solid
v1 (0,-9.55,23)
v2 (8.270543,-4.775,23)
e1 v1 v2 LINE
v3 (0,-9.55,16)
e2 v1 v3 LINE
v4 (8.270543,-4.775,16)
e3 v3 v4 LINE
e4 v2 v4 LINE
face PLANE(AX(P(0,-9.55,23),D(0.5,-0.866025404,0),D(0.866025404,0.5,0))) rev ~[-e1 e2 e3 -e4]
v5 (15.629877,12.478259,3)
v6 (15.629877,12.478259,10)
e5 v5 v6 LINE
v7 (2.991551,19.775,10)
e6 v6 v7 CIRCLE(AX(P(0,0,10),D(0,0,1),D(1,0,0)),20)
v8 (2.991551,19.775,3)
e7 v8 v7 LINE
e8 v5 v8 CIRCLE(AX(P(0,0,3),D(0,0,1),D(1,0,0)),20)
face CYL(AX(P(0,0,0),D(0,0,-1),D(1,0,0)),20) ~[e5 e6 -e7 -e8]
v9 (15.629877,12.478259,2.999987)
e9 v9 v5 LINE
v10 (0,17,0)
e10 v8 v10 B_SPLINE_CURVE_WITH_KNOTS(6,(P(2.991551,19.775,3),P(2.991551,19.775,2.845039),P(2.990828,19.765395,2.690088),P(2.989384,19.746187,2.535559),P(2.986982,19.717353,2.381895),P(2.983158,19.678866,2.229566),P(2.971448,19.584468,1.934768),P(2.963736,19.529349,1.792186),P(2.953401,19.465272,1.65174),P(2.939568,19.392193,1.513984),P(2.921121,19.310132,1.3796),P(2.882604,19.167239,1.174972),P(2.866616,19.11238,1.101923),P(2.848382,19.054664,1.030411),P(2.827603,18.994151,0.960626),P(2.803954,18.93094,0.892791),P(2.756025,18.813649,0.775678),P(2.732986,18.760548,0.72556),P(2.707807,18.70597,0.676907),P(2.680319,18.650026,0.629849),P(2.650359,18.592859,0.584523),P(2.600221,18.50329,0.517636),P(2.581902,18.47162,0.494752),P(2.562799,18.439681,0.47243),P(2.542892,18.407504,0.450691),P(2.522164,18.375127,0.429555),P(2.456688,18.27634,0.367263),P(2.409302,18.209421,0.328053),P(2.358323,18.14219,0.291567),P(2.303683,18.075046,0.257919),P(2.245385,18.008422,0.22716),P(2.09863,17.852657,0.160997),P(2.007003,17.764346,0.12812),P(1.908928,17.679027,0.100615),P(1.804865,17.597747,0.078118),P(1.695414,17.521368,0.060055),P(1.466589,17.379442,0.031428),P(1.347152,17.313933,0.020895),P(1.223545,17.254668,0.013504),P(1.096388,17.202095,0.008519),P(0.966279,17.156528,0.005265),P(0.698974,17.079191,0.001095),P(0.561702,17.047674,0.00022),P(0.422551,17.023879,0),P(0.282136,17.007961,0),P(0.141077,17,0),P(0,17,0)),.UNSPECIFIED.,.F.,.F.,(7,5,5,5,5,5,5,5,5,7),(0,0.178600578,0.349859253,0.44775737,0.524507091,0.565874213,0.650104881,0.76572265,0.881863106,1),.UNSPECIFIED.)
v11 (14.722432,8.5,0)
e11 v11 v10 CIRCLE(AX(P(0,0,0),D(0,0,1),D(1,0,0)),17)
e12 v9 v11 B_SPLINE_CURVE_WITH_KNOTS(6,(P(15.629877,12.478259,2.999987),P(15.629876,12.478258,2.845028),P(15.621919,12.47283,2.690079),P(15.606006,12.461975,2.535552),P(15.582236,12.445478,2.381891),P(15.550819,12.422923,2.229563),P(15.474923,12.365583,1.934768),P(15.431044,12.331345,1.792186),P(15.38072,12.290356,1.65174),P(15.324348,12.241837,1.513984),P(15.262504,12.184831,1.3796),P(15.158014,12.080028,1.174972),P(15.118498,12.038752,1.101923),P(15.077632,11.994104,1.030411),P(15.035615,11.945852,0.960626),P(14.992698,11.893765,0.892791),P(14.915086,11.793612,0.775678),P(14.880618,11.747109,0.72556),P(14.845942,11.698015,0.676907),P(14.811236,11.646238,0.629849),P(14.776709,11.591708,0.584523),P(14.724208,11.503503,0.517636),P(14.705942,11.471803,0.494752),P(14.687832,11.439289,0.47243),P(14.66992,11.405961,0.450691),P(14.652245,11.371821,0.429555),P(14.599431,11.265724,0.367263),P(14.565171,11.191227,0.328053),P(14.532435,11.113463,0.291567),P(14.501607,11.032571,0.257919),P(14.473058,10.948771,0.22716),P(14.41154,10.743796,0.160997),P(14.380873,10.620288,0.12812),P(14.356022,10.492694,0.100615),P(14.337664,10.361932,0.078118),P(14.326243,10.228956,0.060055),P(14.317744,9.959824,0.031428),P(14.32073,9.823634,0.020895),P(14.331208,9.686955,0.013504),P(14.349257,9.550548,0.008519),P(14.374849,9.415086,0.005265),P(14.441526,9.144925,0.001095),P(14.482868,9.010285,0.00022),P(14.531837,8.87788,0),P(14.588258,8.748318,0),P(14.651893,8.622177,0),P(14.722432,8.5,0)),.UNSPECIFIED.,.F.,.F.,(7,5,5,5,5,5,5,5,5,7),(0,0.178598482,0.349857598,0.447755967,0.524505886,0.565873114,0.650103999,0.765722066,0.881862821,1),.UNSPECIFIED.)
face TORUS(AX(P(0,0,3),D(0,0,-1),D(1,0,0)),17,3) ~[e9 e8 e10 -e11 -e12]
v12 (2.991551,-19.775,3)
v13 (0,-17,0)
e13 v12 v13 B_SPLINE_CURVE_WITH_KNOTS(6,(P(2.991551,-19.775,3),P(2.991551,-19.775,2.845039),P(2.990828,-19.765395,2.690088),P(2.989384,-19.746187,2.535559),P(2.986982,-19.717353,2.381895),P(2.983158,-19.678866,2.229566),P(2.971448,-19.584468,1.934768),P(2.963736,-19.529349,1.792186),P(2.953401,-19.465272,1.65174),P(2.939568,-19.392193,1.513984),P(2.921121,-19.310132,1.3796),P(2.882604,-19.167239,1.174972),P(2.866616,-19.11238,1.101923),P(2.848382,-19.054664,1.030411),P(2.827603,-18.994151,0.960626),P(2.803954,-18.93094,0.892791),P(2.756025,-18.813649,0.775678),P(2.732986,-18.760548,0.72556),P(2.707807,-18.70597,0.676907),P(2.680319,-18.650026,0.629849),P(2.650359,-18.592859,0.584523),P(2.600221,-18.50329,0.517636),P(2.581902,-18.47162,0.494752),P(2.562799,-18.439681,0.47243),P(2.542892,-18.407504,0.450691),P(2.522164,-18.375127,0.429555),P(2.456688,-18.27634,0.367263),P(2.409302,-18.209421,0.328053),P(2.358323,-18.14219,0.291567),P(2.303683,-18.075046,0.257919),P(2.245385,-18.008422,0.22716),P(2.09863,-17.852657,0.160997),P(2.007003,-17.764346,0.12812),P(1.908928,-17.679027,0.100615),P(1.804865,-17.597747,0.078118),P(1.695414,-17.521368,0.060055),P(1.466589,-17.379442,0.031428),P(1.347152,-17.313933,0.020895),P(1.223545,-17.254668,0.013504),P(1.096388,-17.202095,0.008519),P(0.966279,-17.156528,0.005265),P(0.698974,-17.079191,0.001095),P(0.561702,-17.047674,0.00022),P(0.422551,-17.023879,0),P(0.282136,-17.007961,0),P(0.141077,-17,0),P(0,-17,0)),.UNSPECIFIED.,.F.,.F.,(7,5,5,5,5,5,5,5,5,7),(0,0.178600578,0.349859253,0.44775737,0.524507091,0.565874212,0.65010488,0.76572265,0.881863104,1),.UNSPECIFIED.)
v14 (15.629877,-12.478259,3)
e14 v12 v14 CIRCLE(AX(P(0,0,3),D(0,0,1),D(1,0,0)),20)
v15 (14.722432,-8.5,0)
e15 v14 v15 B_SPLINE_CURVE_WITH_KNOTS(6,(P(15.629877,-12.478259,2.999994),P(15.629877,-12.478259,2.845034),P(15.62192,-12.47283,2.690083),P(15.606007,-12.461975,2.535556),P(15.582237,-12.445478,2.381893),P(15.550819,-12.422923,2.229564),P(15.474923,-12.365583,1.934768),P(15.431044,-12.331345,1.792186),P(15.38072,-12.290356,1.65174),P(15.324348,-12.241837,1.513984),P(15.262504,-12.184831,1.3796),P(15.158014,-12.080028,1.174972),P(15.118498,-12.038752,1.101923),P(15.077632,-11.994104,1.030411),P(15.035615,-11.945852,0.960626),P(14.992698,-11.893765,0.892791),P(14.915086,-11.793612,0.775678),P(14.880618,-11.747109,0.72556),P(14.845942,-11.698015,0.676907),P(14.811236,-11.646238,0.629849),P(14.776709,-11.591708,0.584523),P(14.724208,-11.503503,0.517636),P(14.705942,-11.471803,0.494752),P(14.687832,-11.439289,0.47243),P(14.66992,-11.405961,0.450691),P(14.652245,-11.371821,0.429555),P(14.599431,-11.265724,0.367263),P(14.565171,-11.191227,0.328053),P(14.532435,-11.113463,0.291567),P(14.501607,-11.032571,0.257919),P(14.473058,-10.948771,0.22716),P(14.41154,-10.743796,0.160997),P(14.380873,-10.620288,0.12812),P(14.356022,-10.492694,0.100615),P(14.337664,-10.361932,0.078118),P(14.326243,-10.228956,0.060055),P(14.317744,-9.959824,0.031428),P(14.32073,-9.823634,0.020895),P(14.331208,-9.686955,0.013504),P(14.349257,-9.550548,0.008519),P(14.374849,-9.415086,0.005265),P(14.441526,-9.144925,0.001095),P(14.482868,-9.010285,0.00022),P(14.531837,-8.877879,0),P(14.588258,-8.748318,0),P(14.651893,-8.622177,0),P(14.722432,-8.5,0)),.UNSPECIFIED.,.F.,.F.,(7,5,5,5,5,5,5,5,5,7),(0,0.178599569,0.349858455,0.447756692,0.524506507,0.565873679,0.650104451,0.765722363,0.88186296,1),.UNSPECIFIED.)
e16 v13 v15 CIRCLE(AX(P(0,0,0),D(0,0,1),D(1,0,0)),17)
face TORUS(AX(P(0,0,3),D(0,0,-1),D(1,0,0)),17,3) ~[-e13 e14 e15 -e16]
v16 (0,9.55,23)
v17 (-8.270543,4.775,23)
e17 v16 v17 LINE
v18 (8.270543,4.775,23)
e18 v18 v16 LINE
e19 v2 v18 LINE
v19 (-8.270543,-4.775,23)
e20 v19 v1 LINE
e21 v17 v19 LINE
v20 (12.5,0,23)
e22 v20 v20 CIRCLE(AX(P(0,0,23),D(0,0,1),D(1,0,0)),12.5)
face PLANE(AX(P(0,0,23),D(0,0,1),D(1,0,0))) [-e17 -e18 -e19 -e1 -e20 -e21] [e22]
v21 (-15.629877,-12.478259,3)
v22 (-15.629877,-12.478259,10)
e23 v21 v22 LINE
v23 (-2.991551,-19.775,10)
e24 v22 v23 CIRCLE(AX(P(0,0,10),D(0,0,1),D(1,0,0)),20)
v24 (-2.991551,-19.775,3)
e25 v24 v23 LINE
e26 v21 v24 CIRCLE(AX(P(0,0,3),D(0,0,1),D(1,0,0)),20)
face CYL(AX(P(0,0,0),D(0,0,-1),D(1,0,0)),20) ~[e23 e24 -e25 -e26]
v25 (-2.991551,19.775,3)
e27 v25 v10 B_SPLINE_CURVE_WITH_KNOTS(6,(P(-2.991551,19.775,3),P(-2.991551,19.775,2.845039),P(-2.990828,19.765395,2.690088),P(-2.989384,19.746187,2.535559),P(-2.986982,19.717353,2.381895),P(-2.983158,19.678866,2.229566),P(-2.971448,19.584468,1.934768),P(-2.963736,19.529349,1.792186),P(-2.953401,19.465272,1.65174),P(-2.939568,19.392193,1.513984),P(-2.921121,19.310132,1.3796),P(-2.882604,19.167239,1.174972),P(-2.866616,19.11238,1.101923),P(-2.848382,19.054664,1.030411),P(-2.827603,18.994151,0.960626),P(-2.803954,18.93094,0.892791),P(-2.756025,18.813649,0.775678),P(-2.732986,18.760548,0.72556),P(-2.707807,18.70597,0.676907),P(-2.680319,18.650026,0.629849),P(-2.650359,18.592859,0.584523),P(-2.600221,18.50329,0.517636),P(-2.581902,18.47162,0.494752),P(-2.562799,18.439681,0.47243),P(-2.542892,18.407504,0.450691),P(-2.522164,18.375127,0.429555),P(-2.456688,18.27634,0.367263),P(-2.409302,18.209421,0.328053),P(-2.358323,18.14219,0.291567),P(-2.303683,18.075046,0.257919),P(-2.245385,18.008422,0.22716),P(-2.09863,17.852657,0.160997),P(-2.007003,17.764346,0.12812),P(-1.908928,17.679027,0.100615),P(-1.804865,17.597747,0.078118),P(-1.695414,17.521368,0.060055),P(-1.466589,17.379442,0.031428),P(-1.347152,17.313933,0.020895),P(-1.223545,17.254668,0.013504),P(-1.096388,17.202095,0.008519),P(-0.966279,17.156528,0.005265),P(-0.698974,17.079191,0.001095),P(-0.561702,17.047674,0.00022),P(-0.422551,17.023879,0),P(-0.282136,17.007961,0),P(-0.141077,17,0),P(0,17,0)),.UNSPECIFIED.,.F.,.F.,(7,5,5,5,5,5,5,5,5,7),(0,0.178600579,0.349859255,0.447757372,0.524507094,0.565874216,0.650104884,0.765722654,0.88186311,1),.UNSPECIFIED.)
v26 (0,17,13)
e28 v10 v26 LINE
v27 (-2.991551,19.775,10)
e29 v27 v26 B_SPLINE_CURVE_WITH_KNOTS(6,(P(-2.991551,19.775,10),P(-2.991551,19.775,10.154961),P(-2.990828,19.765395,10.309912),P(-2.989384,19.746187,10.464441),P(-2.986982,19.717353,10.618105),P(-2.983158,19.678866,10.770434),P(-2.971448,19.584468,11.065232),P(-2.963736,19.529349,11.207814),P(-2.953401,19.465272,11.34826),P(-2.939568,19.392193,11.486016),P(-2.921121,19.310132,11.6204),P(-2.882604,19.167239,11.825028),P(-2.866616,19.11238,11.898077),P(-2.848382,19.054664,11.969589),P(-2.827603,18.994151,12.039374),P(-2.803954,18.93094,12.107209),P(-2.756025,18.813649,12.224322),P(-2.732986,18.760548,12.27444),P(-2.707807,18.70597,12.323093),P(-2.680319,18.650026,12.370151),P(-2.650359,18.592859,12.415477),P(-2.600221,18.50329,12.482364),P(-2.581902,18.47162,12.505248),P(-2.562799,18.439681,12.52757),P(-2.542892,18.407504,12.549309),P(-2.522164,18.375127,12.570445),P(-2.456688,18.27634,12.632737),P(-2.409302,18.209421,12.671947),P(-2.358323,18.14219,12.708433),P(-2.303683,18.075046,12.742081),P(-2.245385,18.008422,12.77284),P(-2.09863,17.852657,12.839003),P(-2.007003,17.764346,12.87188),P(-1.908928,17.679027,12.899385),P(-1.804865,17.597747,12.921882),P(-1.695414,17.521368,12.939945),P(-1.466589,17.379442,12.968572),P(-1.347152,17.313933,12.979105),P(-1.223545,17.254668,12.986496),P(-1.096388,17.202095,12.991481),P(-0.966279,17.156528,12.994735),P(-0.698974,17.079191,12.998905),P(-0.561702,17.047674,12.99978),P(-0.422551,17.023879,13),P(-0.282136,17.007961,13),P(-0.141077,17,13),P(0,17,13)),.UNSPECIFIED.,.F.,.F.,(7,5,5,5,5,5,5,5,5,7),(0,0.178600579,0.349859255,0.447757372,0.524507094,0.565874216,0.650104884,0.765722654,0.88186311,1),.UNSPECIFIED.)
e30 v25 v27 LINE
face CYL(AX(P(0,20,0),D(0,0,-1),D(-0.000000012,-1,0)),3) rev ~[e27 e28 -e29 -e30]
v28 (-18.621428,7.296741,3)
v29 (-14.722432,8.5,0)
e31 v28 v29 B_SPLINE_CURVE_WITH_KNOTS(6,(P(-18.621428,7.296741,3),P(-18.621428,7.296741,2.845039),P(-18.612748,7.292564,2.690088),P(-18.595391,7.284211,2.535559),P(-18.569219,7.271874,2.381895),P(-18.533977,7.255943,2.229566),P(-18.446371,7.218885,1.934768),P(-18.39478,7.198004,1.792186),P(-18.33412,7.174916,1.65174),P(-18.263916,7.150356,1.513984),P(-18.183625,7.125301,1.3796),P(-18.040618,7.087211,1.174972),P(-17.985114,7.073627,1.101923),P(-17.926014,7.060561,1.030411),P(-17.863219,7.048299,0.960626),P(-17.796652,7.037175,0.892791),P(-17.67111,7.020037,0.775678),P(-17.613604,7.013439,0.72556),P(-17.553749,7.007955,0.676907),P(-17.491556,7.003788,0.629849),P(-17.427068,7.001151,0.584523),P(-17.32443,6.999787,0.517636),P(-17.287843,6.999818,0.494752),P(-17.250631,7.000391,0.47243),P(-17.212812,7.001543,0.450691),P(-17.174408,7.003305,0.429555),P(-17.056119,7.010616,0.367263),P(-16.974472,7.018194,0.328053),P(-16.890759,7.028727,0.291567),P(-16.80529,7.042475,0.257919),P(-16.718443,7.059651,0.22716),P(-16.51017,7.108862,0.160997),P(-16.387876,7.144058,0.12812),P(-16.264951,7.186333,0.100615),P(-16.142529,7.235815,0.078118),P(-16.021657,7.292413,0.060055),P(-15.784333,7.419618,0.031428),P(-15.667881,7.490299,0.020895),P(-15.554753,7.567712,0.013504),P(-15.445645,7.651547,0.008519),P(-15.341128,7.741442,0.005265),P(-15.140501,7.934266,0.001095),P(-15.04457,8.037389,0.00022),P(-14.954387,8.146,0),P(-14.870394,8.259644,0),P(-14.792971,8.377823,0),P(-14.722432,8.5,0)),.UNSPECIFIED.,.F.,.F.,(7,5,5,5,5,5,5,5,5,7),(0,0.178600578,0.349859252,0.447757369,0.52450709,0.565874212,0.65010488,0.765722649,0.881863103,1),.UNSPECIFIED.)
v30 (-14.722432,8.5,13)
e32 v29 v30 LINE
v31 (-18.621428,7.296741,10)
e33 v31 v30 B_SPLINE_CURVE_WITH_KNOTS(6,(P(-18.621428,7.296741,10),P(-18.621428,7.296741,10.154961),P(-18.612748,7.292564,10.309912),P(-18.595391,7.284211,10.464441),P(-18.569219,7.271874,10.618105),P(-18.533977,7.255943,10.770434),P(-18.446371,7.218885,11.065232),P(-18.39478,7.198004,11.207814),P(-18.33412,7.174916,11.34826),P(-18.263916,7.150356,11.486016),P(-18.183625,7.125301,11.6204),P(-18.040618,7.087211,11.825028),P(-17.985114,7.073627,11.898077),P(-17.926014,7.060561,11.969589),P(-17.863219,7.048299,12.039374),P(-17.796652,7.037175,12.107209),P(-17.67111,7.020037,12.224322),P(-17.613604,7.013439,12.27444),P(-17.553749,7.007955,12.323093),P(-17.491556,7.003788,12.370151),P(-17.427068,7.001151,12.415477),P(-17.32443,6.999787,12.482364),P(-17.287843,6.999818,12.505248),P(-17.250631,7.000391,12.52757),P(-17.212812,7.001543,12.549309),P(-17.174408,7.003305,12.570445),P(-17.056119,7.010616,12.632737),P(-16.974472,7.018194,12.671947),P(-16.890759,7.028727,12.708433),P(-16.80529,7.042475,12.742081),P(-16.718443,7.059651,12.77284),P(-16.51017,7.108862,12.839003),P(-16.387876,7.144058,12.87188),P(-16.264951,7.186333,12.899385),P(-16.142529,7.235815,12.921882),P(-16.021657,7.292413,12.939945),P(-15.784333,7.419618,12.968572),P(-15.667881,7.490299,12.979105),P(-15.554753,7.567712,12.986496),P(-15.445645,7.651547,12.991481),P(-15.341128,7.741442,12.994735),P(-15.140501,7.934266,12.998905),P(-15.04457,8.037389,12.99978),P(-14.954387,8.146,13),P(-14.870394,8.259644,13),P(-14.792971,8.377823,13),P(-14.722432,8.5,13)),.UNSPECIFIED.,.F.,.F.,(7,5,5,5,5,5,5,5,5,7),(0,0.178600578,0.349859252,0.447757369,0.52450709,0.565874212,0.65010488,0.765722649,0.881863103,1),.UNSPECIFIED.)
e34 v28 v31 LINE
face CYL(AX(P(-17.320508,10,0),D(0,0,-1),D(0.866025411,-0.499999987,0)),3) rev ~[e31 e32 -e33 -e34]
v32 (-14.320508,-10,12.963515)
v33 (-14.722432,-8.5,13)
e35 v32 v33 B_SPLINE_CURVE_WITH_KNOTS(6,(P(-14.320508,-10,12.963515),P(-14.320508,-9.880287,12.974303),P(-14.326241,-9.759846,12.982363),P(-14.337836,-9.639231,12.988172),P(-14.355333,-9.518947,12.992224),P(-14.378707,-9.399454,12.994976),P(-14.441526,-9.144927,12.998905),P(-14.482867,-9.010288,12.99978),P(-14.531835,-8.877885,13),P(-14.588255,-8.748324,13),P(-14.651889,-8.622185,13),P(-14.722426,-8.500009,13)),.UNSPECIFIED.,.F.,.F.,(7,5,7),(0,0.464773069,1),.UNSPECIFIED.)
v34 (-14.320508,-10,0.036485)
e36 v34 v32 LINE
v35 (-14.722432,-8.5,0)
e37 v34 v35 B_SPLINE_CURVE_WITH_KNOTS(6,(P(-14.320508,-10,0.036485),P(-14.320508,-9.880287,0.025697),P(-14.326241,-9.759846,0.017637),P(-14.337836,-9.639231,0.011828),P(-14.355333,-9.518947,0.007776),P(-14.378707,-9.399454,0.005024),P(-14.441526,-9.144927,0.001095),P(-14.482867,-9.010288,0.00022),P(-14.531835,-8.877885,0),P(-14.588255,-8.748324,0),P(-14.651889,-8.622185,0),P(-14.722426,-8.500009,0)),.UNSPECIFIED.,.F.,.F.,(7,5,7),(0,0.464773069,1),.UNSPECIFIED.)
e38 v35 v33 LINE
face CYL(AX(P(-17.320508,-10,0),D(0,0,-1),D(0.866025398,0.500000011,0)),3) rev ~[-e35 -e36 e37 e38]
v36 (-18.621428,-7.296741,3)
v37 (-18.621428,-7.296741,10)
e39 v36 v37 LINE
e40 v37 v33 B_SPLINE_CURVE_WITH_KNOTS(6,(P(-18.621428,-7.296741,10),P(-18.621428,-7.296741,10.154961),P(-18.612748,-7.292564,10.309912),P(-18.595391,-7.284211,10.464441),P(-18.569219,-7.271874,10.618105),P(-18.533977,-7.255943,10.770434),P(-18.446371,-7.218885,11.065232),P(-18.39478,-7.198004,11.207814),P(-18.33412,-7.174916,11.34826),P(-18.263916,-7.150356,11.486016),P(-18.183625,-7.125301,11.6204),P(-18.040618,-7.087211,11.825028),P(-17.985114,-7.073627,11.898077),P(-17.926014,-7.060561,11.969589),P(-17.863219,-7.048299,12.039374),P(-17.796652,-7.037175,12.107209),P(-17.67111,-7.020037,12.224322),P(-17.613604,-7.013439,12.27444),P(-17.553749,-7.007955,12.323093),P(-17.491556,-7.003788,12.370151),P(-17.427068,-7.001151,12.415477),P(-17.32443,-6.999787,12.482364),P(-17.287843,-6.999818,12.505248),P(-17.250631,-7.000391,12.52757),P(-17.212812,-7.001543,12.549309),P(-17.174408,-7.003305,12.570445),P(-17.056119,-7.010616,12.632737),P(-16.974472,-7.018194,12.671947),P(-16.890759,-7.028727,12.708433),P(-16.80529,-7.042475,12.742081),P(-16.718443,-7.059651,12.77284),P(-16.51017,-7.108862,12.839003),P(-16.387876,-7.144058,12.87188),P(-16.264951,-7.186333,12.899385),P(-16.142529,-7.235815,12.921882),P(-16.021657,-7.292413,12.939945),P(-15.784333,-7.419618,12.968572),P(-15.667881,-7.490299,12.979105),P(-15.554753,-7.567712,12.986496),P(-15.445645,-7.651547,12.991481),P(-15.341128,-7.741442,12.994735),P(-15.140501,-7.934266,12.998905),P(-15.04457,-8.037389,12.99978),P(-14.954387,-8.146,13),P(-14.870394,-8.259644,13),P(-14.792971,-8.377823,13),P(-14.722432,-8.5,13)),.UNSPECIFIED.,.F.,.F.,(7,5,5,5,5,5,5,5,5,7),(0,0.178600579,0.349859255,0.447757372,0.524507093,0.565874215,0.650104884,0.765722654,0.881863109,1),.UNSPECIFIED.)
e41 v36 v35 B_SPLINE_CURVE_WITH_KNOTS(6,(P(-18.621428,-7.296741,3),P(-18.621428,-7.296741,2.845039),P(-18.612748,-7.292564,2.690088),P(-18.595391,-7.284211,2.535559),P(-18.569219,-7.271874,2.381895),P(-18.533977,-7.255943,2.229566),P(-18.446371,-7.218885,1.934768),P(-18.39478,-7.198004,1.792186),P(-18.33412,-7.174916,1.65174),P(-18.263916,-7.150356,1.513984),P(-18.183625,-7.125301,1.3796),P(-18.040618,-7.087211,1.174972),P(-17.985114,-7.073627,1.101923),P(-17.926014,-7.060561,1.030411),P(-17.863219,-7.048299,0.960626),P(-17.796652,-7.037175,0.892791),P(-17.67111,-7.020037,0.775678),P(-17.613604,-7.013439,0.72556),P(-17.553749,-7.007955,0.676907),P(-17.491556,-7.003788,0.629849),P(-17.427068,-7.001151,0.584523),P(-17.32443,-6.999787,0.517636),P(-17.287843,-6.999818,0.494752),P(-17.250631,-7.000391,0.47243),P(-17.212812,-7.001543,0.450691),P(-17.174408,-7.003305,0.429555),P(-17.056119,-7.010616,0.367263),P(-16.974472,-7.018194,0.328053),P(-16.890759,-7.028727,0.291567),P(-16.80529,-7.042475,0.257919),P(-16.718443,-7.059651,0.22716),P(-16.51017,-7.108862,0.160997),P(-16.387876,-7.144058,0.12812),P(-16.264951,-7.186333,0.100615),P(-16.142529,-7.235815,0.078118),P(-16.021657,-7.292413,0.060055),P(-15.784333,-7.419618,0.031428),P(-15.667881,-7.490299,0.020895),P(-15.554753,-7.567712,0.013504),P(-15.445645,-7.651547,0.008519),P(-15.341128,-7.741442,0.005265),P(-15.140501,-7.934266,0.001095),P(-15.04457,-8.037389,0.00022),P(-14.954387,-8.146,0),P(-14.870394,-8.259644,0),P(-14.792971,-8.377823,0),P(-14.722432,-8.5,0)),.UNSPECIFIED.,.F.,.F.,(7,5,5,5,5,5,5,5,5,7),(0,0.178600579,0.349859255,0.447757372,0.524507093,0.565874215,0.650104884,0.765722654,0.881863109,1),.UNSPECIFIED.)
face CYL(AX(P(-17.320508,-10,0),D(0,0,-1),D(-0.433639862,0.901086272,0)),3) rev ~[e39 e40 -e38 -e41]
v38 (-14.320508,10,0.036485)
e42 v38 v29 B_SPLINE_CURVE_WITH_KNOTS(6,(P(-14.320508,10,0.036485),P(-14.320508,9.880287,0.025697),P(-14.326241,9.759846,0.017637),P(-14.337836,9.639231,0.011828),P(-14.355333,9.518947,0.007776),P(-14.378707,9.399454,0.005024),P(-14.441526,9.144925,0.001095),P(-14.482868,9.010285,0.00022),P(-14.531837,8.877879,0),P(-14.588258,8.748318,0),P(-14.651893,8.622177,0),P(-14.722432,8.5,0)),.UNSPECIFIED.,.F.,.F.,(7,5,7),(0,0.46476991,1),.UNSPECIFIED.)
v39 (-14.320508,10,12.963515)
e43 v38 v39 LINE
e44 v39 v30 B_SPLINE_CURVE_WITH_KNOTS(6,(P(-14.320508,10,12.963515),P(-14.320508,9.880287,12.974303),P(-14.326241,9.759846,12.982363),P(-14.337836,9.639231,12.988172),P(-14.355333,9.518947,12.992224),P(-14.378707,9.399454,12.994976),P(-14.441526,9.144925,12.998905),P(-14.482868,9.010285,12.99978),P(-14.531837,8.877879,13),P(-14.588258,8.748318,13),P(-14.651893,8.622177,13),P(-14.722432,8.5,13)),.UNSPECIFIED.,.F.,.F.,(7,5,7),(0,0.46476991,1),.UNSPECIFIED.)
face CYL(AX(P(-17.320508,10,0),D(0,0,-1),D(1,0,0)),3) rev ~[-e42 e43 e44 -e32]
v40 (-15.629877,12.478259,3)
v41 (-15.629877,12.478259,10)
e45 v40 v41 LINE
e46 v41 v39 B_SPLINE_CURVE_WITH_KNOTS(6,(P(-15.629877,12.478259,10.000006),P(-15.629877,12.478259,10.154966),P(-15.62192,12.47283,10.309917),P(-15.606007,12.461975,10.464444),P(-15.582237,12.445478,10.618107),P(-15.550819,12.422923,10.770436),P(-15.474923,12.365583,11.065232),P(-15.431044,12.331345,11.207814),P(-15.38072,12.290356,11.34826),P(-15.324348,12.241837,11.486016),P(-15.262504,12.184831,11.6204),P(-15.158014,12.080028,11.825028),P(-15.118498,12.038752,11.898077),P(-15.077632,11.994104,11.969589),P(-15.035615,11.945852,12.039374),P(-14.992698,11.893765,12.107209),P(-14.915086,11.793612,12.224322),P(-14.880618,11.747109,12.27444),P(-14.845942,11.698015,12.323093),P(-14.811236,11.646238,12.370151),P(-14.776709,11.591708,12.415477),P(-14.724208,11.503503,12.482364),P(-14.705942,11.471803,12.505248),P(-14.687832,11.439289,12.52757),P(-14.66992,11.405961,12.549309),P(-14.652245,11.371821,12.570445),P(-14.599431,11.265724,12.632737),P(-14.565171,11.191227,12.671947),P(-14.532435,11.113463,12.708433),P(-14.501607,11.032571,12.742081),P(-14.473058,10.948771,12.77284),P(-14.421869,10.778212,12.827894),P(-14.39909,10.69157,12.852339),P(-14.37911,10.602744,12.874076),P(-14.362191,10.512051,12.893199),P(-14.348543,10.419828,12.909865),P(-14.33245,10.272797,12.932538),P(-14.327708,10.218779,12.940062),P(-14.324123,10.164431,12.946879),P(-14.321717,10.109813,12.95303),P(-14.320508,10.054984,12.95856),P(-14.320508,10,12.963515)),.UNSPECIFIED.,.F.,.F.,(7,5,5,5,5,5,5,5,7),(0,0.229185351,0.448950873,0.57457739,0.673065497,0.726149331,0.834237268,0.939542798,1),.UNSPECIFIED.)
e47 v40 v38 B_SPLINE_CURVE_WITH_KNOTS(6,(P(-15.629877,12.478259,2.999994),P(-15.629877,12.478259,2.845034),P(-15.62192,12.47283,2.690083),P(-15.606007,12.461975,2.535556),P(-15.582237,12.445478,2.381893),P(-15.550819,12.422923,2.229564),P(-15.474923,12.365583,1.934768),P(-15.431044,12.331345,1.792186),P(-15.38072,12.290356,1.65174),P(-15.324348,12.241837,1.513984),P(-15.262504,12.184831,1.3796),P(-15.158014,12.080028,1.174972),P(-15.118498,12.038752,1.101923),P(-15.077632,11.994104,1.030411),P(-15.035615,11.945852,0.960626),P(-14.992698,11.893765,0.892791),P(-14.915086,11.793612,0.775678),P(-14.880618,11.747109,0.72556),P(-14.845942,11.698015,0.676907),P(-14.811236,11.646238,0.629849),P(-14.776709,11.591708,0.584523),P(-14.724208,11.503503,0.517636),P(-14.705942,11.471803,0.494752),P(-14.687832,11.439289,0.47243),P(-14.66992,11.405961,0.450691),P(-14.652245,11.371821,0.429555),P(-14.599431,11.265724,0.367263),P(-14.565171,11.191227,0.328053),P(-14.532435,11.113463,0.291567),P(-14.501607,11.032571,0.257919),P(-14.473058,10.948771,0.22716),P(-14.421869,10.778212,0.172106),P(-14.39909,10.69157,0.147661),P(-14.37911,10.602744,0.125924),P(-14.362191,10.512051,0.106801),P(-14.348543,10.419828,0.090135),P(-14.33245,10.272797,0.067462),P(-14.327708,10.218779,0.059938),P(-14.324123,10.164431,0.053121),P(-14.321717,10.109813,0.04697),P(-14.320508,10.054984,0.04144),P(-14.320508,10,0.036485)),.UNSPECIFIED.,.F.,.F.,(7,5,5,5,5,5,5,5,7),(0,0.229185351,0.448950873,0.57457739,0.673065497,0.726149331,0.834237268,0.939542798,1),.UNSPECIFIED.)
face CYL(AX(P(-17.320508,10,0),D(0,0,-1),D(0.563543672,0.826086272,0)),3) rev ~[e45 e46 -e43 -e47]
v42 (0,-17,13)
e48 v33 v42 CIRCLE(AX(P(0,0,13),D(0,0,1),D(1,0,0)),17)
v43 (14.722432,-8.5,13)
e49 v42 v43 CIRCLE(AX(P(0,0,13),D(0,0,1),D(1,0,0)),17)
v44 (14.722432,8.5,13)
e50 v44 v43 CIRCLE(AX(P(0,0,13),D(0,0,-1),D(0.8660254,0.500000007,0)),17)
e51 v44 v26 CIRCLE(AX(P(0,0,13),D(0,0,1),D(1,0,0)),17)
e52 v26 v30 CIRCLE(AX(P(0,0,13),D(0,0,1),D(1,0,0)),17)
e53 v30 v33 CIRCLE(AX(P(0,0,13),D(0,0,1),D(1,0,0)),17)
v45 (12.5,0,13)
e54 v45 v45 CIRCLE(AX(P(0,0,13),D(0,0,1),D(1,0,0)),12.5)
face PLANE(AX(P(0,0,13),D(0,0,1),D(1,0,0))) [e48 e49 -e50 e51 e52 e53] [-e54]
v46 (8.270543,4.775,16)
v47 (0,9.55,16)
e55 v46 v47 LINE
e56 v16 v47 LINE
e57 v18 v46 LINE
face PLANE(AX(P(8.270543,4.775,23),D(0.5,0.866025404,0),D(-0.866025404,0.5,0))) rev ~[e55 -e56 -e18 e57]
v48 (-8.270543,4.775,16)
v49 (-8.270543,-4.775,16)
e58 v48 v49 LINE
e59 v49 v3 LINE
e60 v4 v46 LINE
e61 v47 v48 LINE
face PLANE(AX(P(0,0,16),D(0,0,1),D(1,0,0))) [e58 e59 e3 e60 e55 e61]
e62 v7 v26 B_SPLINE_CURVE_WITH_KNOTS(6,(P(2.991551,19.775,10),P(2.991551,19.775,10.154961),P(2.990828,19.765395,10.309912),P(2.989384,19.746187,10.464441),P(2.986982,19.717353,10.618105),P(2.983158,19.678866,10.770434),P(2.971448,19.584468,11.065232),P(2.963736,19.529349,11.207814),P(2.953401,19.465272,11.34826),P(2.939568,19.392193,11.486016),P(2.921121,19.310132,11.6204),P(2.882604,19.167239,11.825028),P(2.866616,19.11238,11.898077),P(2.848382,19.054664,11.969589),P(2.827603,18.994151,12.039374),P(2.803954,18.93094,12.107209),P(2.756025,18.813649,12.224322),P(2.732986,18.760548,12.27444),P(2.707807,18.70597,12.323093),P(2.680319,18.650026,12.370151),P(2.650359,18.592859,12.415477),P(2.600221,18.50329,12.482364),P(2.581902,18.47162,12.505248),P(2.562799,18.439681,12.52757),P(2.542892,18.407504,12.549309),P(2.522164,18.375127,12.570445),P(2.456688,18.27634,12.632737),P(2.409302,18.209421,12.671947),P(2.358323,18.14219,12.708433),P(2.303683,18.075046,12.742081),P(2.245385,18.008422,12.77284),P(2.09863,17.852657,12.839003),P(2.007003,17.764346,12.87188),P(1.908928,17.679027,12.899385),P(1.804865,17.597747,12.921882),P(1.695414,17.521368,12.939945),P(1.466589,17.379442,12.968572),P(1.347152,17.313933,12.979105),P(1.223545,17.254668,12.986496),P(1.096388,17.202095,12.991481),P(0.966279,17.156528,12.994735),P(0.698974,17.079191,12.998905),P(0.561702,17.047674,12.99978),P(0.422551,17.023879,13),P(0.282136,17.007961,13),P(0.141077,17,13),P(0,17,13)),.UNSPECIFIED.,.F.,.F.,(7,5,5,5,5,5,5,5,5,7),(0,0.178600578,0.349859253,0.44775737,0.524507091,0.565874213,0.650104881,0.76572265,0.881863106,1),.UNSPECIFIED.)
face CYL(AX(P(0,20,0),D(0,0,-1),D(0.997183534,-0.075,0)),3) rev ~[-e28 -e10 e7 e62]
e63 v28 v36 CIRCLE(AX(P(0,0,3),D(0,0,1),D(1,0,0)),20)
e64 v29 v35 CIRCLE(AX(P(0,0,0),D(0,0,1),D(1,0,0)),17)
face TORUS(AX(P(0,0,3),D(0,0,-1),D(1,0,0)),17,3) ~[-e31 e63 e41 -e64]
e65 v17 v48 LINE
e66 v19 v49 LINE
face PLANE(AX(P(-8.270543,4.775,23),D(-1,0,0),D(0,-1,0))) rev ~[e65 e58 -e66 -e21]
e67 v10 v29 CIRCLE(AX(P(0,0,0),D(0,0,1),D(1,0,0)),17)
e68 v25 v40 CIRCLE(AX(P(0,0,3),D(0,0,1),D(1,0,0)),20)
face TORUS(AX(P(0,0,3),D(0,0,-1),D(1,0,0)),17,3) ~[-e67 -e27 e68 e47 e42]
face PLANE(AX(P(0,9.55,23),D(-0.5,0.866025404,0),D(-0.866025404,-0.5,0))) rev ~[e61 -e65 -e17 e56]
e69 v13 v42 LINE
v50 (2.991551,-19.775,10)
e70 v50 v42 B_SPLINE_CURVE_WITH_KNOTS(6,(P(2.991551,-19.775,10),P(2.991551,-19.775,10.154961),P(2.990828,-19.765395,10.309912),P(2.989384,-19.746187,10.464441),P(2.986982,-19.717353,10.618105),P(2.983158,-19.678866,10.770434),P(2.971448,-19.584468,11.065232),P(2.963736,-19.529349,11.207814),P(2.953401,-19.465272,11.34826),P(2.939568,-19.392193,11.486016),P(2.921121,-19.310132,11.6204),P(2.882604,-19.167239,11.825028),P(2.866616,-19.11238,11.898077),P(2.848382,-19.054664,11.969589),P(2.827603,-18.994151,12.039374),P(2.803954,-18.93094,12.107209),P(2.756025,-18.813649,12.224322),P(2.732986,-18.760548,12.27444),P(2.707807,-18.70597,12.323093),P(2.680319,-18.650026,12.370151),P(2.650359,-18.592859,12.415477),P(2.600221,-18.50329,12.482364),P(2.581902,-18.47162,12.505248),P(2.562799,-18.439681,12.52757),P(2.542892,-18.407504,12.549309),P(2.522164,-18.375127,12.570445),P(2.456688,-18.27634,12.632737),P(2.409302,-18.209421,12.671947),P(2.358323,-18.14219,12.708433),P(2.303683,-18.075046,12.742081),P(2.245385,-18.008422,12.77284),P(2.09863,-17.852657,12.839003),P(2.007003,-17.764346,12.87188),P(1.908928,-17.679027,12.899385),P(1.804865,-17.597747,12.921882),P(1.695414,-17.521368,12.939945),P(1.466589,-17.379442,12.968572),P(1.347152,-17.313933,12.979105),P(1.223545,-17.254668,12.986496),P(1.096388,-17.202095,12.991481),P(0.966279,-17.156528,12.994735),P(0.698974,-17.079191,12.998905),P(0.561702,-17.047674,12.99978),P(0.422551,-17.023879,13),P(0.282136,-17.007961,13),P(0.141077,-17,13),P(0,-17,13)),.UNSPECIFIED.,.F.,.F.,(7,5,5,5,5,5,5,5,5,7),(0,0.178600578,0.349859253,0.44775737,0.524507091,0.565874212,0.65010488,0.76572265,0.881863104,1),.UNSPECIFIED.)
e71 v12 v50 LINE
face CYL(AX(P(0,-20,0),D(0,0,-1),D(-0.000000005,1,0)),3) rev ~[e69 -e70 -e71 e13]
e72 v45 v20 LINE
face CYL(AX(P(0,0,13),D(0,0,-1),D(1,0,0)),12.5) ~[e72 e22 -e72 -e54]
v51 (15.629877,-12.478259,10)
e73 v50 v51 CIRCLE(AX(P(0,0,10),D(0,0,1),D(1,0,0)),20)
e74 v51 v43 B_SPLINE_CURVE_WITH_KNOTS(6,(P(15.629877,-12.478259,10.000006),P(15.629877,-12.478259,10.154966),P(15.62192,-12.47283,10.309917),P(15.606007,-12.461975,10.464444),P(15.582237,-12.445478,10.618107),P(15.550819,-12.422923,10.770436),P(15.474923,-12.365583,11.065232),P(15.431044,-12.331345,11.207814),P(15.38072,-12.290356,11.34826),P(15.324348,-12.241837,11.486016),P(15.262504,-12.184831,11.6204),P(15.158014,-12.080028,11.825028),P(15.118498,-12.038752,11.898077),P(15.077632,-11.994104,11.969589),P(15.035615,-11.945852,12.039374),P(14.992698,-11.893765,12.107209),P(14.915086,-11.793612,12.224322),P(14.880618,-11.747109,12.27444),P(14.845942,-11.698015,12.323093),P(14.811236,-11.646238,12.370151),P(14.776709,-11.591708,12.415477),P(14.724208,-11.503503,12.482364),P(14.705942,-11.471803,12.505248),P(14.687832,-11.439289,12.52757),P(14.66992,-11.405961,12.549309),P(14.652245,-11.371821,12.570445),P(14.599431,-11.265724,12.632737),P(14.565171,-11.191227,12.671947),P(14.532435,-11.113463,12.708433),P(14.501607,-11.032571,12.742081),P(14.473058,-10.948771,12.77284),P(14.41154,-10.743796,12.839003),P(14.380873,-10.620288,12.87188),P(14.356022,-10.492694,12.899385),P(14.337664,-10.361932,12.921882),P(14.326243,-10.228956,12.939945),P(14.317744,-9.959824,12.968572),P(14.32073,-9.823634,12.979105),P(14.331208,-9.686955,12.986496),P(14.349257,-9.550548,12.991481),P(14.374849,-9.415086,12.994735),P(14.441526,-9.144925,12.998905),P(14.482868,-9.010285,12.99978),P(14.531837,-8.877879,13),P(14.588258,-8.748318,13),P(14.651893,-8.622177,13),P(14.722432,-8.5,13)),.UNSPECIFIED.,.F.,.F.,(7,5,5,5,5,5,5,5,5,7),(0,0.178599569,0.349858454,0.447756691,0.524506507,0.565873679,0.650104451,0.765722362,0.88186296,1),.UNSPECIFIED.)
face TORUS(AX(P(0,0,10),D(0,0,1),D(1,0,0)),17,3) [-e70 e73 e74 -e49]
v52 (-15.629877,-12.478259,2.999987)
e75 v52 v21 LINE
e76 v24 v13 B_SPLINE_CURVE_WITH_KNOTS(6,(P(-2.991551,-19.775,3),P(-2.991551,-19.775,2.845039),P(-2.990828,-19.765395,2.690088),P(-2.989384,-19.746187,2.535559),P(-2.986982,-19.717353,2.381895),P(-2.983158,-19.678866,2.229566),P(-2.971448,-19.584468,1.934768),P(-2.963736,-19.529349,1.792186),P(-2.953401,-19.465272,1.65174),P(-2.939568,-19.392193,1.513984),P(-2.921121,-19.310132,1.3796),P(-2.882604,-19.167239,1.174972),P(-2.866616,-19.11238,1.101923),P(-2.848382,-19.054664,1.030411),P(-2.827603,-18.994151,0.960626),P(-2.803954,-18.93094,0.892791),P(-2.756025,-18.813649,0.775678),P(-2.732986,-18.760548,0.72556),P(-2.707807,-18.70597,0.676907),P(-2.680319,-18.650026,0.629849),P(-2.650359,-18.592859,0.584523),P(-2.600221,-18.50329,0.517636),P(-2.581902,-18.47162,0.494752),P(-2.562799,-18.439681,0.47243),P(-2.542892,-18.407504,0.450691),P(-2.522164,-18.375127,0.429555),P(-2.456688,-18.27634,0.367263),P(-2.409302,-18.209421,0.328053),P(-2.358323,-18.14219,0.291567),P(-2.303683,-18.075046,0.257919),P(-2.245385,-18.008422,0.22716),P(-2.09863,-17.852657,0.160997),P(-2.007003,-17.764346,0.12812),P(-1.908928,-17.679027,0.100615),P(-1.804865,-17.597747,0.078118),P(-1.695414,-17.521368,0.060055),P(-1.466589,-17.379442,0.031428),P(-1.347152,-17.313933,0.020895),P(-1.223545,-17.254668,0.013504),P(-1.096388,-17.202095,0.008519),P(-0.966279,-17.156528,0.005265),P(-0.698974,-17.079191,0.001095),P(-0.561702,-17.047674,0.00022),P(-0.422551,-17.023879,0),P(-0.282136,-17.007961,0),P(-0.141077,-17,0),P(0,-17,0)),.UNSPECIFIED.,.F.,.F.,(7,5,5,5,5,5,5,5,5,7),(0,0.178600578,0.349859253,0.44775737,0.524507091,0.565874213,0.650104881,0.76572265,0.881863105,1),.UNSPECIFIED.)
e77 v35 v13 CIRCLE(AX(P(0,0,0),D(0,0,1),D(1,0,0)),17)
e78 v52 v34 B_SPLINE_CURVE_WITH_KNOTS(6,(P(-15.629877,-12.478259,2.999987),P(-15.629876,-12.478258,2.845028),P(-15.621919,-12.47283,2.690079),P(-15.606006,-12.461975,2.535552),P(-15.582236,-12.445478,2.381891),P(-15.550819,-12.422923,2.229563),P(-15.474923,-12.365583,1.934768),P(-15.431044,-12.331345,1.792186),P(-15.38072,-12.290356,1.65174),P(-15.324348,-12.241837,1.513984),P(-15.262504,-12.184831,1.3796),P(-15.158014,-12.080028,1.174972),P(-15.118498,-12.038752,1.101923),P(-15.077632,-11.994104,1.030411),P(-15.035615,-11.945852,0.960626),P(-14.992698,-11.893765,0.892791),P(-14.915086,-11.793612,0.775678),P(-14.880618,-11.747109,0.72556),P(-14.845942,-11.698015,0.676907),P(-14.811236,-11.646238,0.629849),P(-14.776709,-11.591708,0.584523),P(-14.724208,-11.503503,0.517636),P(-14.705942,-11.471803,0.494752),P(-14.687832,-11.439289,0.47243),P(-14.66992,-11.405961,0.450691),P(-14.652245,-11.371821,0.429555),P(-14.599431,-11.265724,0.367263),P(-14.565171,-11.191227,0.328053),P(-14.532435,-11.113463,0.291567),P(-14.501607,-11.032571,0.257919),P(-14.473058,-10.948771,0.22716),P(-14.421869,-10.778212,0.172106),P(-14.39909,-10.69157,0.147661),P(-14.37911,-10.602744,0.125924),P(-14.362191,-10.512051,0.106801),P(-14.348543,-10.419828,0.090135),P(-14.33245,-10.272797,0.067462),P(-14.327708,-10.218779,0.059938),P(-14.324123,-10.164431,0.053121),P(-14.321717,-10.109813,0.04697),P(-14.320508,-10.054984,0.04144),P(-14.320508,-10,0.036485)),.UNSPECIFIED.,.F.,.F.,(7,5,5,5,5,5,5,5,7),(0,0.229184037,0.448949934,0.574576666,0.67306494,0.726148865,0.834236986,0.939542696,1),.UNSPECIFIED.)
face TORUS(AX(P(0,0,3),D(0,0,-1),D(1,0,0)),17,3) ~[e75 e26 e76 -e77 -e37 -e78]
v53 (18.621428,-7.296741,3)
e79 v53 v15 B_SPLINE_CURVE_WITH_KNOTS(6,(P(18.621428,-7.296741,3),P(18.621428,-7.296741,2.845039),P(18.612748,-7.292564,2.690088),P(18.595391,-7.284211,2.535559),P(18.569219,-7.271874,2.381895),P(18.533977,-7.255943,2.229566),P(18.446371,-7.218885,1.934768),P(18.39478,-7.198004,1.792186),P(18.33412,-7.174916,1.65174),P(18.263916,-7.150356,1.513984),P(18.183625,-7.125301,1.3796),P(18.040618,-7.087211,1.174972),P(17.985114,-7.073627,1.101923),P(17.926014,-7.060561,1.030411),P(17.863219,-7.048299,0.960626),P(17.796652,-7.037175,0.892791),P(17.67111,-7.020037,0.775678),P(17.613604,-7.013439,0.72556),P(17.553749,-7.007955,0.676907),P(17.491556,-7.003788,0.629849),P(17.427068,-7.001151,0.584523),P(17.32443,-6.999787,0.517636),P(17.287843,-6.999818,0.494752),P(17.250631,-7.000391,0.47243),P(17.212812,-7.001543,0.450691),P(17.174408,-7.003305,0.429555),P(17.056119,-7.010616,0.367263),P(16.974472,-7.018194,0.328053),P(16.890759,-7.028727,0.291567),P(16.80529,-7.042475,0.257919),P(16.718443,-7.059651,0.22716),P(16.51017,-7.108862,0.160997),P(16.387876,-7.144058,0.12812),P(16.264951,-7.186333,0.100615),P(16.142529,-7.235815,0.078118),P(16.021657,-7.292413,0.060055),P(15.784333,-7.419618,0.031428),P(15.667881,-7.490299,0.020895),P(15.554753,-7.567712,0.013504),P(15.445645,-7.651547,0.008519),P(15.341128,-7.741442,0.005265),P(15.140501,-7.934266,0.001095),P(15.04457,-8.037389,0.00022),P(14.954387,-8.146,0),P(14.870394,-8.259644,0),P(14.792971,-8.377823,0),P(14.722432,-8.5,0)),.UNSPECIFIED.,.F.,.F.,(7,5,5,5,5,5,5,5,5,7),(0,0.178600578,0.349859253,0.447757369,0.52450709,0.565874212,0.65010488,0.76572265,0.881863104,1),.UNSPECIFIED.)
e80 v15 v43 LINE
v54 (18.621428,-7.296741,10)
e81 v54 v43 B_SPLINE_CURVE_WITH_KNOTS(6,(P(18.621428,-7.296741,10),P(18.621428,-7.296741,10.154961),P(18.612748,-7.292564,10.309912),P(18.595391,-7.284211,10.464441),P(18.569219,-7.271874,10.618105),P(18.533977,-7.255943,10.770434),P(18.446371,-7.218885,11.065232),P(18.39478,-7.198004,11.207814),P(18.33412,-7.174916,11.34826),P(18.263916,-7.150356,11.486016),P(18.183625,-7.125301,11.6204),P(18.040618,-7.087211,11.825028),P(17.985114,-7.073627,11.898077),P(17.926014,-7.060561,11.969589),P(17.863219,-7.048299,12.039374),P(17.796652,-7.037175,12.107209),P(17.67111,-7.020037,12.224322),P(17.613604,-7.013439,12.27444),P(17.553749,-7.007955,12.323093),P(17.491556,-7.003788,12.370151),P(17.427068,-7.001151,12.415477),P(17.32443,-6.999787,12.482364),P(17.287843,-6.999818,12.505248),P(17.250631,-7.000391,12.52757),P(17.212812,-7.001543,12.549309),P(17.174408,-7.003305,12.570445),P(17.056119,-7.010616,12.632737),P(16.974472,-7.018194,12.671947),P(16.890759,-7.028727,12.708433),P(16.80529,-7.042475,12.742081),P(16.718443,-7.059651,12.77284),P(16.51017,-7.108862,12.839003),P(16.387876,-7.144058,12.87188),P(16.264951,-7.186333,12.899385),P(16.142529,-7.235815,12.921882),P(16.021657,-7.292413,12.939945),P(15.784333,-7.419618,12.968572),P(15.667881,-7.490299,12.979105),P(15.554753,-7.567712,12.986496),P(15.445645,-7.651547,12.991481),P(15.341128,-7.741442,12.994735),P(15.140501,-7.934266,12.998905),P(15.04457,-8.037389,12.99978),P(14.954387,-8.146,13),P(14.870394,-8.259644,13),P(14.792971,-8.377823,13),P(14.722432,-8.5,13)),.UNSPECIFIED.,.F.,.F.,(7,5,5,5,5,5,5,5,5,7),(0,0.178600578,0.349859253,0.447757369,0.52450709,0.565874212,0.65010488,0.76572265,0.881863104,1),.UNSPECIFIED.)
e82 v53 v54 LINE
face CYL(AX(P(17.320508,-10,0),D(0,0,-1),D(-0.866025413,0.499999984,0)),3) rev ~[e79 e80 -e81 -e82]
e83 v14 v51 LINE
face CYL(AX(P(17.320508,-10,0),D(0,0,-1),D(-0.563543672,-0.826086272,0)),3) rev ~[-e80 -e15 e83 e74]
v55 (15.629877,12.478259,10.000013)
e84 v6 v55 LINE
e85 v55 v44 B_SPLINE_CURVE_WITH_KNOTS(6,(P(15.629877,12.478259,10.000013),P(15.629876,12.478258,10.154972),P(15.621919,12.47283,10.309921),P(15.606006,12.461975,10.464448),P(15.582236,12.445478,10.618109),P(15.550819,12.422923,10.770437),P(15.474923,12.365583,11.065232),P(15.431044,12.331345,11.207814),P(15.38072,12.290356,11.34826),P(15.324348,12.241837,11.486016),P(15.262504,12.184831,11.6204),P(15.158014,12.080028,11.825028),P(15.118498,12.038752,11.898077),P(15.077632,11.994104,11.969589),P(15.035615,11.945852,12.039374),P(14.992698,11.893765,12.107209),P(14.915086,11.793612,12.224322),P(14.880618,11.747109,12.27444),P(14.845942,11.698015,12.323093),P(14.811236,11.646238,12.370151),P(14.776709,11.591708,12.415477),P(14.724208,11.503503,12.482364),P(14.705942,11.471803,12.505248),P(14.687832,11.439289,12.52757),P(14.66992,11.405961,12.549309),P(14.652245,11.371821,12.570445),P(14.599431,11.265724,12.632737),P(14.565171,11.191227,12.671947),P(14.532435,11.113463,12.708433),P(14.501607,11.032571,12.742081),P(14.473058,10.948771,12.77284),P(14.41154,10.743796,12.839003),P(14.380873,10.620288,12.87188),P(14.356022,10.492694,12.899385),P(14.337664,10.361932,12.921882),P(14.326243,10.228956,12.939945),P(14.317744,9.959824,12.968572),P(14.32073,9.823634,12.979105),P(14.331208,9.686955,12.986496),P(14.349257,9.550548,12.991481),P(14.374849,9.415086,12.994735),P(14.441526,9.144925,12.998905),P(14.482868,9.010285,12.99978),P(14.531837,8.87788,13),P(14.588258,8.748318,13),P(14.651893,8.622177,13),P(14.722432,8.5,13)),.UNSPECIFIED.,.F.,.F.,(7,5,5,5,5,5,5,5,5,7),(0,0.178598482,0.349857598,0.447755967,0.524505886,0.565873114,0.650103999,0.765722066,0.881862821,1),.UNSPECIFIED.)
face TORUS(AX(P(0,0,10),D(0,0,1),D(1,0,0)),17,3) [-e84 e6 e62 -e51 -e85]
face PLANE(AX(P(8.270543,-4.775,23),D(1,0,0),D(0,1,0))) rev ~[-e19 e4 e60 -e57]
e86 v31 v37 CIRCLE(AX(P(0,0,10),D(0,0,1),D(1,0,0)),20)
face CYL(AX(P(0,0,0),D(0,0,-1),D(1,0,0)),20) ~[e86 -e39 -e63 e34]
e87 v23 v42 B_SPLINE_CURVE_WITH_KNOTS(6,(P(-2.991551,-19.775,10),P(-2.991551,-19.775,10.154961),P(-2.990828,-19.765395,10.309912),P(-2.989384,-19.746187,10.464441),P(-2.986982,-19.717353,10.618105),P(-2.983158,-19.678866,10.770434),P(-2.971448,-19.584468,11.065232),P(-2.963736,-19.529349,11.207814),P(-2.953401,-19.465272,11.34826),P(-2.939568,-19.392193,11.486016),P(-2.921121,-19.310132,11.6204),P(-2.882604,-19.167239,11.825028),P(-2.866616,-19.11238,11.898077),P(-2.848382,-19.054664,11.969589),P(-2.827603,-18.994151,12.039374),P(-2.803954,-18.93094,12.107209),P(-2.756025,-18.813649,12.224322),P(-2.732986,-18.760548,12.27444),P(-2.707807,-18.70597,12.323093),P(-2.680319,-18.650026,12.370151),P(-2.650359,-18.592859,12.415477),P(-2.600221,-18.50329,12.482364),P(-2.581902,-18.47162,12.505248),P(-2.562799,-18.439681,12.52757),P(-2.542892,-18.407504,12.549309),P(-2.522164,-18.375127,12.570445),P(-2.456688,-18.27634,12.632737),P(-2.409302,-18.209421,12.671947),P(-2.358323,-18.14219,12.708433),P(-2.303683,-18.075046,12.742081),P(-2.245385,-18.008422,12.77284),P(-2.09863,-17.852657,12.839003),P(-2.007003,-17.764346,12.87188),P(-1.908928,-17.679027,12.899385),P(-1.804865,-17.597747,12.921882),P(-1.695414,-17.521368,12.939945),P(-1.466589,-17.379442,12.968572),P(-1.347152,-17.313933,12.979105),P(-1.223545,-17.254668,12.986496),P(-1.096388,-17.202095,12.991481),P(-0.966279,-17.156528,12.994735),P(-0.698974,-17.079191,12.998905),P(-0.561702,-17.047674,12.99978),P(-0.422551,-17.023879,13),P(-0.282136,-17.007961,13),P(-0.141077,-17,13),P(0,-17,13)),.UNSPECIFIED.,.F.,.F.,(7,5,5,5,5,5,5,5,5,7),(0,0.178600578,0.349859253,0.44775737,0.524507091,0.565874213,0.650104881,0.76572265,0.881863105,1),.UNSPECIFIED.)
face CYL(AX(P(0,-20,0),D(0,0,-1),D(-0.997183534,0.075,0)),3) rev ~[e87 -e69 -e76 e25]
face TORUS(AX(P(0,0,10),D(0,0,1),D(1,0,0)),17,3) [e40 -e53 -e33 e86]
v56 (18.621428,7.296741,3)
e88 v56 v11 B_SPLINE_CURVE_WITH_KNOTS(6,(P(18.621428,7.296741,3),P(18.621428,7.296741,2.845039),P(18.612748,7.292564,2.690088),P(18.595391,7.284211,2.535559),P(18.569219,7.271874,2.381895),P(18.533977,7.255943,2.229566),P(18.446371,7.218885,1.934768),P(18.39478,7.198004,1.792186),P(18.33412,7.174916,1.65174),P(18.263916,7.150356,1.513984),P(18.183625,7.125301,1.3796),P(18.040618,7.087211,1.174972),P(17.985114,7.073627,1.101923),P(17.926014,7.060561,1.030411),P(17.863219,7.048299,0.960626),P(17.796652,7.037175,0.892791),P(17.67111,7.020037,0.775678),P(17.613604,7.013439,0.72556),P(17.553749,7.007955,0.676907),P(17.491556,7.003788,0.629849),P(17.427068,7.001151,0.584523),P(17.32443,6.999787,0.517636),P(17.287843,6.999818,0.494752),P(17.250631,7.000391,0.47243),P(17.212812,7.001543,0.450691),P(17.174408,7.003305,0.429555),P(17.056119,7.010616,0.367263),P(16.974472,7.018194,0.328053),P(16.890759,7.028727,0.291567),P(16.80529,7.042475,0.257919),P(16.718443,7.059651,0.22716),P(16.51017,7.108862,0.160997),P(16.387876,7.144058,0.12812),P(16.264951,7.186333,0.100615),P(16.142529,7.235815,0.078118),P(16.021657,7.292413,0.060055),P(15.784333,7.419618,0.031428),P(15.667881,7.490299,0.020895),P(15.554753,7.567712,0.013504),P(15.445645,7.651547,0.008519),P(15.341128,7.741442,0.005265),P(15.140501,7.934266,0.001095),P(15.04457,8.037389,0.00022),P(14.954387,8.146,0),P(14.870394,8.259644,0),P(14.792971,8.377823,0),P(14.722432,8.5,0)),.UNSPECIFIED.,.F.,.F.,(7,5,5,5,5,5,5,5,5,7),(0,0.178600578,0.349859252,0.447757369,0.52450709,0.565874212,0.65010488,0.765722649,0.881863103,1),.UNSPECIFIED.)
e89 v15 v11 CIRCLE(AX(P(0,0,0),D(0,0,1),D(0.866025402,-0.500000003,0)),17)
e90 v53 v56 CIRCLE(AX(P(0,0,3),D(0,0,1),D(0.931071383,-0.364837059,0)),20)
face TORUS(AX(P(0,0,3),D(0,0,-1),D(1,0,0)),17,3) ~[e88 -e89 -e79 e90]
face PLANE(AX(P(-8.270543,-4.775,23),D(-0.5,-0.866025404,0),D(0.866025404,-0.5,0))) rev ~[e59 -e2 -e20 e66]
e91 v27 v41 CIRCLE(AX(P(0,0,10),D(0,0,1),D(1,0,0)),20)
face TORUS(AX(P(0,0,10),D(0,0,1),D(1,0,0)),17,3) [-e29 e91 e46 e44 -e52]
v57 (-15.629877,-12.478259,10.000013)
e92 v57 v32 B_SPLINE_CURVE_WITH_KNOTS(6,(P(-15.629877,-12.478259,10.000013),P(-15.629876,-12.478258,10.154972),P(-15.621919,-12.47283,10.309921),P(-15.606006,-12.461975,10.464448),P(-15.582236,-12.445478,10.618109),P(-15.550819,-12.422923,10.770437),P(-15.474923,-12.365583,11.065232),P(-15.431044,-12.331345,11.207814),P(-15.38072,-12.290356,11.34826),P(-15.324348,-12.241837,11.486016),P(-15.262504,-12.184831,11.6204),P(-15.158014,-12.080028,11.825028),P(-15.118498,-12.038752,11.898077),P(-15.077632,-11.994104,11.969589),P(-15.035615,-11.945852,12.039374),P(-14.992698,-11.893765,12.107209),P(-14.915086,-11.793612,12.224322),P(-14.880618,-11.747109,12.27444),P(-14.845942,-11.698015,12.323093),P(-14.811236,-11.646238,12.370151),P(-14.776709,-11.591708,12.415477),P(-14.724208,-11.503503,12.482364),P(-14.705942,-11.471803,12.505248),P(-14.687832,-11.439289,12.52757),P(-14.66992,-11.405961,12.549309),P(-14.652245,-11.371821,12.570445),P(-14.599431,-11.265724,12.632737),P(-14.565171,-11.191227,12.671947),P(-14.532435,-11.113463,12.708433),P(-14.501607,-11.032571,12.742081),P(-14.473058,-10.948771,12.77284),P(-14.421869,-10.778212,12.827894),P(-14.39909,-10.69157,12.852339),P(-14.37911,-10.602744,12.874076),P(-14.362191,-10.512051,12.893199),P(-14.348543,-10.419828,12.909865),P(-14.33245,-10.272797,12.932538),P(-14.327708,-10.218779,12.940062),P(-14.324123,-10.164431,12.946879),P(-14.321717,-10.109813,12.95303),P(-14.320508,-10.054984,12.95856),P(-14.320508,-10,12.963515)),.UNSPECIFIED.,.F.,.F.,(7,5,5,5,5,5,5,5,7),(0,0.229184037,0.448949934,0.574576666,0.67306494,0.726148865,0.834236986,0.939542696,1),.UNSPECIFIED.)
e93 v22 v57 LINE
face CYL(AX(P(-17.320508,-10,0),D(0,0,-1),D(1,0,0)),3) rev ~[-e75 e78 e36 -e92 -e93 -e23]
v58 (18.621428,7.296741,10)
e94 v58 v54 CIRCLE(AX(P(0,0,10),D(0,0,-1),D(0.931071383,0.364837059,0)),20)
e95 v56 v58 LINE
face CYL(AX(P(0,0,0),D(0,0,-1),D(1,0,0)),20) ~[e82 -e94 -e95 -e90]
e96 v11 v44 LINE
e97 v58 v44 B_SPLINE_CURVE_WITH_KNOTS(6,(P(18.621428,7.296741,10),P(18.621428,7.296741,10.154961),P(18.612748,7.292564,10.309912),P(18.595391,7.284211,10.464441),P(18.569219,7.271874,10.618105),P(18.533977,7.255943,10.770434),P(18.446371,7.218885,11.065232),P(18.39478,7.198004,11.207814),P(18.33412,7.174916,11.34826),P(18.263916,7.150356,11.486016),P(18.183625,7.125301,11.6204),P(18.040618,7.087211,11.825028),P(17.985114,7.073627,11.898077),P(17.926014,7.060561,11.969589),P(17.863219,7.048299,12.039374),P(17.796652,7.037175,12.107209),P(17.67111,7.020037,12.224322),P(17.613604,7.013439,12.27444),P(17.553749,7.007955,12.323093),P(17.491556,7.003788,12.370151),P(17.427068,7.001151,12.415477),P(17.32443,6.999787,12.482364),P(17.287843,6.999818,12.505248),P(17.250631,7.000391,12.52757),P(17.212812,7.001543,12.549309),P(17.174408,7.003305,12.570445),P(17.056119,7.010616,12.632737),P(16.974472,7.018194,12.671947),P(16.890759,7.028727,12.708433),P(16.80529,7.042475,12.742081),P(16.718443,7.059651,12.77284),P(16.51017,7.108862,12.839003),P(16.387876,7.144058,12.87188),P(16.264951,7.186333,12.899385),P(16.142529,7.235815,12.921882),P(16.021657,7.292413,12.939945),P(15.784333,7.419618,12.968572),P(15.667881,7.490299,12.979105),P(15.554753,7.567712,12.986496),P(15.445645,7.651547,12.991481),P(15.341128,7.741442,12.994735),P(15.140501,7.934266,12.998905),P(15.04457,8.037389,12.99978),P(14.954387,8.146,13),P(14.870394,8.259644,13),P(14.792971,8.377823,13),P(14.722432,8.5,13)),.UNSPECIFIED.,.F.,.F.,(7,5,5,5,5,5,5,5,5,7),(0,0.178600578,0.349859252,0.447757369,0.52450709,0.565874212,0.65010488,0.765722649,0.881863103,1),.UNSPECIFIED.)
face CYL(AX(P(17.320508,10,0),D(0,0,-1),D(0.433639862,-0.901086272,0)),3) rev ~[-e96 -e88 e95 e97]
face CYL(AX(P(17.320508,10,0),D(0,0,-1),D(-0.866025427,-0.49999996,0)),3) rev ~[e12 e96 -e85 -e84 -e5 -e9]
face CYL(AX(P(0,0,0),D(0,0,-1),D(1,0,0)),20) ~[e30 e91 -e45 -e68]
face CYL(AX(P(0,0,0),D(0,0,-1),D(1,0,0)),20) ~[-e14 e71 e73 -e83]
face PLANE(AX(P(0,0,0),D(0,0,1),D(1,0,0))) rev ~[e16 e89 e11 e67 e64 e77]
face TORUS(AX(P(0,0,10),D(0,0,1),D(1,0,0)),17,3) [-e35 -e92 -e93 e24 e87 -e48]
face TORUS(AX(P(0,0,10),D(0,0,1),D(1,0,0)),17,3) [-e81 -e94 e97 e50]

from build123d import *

# Parameters (mm, degrees)
F0_R     = 20
F1_DEPTH = 13
F2_R     = 12.5
F3_DEPTH = 10
F4_R     = 3
F6_DEPTH = 7
F8_DEPTH = 25


with BuildPart() as f1:
    # F0 (on Top) → F1 (new body)
    with BuildSketch(Plane.XY):
        Circle(F0_R)
    extrude(amount=F1_DEPTH)

    # F2 (on face) → F3 (join)
    with BuildSketch(Plane.XY.offset(13)):
        Circle(F2_R)
    extrude(amount=F3_DEPTH)

    # F4
    f4_edges = [f1.edges().sort_by_distance(p)[0] for p in [
        (-20, 0, 13),
        (-20, 0, 0),
    ]]
    fillet(f4_edges, radius=F4_R)

    # F5 (on face) → F6 (cut)
    with BuildSketch(Plane.XY.offset(23)):
        Polygon((8.2705426061, 4.775), (0, 9.55), (-8.2705426061, 4.775), (-8.2705426061, -4.775), (0, -9.55), (8.2705426061, -4.775), align=None)
    extrude(amount=-F6_DEPTH, mode=Mode.SUBTRACT)

    # F7 (on face) → F8 (cut)
    with BuildSketch(Plane(origin=(0, 0, 0), x_dir=(1, 0, 0), z_dir=(0, 0, -1))):
        with BuildLine():
            ThreePointArc((14.7224318372, 8.5000000471), (16.435854573, 7.1334012872), (18.6214276605, 7.2967411826))
            ThreePointArc((18.6214276605, 7.2967411826), (17.3205080757, 10), (15.6298770592, 12.4782588174))
            ThreePointArc((15.6298770592, 12.4782588174), (14.3956340287, 10.6671670025), (14.7224318372, 8.5000000471))
        make_face()
        with BuildLine():
            ThreePointArc((20.3205080757, -10), (19.8604646456, -8.4035600159), (18.6214276605, -7.2967411826))
            ThreePointArc((18.6214276605, -7.2967411826), (17.3205080757, -10), (15.6298770592, -12.4782588174))
            ThreePointArc((15.6298770592, -12.4782588174), (18.7219549977, -12.6525358668), (20.3205080757, -10))
        make_face()
        with BuildLine():
            ThreePointArc((15.6298770592, -12.4782588174), (17.3205080757, -10), (18.6214276605, -7.2967411826))
            ThreePointArc((18.6214276605, -7.2967411826), (16.435854533, -7.1334012995), (14.7224317953, -8.5000001196))
            ThreePointArc((14.7224317953, -8.5000001196), (14.395634038, -10.6671670433), (15.6298770592, -12.4782588174))
        make_face()
        with BuildLine():
            ThreePointArc((-1.46e-08, 17), (2.040220571, 17.8005682502), (2.9915506013, 19.775))
            ThreePointArc((2.9915506013, 19.775), (0, 20), (-2.9915506013, 19.775))
            ThreePointArc((-2.9915506013, 19.775), (-2.0402205817, 17.8005682602), (-1.46e-08, 17))
        make_face()
        with BuildLine():
            ThreePointArc((-2.9915506013, 19.775), (0, 20), (2.9915506013, 19.775))
            ThreePointArc((2.9915506013, 19.775), (2.9978869061, 19.8874207031), (3, 20))
            ThreePointArc((3, 20), (-0.1125792969, 22.9978869061), (-2.9915506013, 19.775))
        make_face()
        with BuildLine():
            ThreePointArc((3, -20), (2.9978869061, -19.8874207031), (2.9915506013, -19.775))
            ThreePointArc((2.9915506013, -19.775), (0, -20), (-2.9915506013, -19.775))
            ThreePointArc((-2.9915506013, -19.775), (-0.1125792969, -22.9978869061), (3, -20))
        make_face()
        with BuildLine():
            ThreePointArc((-2.9915506013, -19.775), (0, -20), (2.9915506013, -19.775))
            ThreePointArc((2.9915506013, -19.775), (2.0402205635, -17.8005682433), (-3.5e-08, -17))
            ThreePointArc((-3.5e-08, -17), (-2.0402205891, -17.8005682671), (-2.9915506013, -19.775))
        make_face()
        with BuildLine():
            ThreePointArc((-18.6214276605, 7.2967411826), (-16.4358546167, 7.1334012737), (-14.7224318829, 8.4999999678))
            ThreePointArc((-14.7224318829, 8.4999999678), (-14.4227306016, 9.2235428467), (-14.3205080757, 10))
            ThreePointArc((-14.3205080757, 10), (-14.6679722089, 11.401446922), (-15.6298770592, 12.4782588174))
            ThreePointArc((-15.6298770592, 12.4782588174), (-17.3205080757, 10), (-18.6214276605, 7.2967411826))
        make_face()
        with BuildLine():
            ThreePointArc((-14.3205080757, -10), (-14.4227305909, -9.2235428867), (-14.7224318416, -8.5000000394))
            ThreePointArc((-14.7224318416, -8.5000000394), (-16.4358545772, -7.1334012859), (-18.6214276605, -7.2967411826))
            ThreePointArc((-18.6214276605, -7.2967411826), (-17.3205080757, -10), (-15.6298770592, -12.4782588174))
            ThreePointArc((-15.6298770592, -12.4782588174), (-14.6679722089, -11.401446922), (-14.3205080757, -10))
        make_face()
        with BuildLine():
            ThreePointArc((-18.6214276605, 7.2967411826), (-17.3205080757, 10), (-15.6298770592, 12.4782588174))
            ThreePointArc((-15.6298770592, 12.4782588174), (-19.918584287, 11.5), (-18.6214276605, 7.2967411826))
        make_face()
        with BuildLine():
            ThreePointArc((-18.6214276605, -7.2967411826), (-19.918584287, -11.5), (-15.6298770592, -12.4782588174))
            ThreePointArc((-15.6298770592, -12.4782588174), (-17.3205080757, -10), (-18.6214276605, -7.2967411826))
        make_face()
    extrude(amount=-F8_DEPTH, mode=Mode.SUBTRACT)


solid = f1.part
